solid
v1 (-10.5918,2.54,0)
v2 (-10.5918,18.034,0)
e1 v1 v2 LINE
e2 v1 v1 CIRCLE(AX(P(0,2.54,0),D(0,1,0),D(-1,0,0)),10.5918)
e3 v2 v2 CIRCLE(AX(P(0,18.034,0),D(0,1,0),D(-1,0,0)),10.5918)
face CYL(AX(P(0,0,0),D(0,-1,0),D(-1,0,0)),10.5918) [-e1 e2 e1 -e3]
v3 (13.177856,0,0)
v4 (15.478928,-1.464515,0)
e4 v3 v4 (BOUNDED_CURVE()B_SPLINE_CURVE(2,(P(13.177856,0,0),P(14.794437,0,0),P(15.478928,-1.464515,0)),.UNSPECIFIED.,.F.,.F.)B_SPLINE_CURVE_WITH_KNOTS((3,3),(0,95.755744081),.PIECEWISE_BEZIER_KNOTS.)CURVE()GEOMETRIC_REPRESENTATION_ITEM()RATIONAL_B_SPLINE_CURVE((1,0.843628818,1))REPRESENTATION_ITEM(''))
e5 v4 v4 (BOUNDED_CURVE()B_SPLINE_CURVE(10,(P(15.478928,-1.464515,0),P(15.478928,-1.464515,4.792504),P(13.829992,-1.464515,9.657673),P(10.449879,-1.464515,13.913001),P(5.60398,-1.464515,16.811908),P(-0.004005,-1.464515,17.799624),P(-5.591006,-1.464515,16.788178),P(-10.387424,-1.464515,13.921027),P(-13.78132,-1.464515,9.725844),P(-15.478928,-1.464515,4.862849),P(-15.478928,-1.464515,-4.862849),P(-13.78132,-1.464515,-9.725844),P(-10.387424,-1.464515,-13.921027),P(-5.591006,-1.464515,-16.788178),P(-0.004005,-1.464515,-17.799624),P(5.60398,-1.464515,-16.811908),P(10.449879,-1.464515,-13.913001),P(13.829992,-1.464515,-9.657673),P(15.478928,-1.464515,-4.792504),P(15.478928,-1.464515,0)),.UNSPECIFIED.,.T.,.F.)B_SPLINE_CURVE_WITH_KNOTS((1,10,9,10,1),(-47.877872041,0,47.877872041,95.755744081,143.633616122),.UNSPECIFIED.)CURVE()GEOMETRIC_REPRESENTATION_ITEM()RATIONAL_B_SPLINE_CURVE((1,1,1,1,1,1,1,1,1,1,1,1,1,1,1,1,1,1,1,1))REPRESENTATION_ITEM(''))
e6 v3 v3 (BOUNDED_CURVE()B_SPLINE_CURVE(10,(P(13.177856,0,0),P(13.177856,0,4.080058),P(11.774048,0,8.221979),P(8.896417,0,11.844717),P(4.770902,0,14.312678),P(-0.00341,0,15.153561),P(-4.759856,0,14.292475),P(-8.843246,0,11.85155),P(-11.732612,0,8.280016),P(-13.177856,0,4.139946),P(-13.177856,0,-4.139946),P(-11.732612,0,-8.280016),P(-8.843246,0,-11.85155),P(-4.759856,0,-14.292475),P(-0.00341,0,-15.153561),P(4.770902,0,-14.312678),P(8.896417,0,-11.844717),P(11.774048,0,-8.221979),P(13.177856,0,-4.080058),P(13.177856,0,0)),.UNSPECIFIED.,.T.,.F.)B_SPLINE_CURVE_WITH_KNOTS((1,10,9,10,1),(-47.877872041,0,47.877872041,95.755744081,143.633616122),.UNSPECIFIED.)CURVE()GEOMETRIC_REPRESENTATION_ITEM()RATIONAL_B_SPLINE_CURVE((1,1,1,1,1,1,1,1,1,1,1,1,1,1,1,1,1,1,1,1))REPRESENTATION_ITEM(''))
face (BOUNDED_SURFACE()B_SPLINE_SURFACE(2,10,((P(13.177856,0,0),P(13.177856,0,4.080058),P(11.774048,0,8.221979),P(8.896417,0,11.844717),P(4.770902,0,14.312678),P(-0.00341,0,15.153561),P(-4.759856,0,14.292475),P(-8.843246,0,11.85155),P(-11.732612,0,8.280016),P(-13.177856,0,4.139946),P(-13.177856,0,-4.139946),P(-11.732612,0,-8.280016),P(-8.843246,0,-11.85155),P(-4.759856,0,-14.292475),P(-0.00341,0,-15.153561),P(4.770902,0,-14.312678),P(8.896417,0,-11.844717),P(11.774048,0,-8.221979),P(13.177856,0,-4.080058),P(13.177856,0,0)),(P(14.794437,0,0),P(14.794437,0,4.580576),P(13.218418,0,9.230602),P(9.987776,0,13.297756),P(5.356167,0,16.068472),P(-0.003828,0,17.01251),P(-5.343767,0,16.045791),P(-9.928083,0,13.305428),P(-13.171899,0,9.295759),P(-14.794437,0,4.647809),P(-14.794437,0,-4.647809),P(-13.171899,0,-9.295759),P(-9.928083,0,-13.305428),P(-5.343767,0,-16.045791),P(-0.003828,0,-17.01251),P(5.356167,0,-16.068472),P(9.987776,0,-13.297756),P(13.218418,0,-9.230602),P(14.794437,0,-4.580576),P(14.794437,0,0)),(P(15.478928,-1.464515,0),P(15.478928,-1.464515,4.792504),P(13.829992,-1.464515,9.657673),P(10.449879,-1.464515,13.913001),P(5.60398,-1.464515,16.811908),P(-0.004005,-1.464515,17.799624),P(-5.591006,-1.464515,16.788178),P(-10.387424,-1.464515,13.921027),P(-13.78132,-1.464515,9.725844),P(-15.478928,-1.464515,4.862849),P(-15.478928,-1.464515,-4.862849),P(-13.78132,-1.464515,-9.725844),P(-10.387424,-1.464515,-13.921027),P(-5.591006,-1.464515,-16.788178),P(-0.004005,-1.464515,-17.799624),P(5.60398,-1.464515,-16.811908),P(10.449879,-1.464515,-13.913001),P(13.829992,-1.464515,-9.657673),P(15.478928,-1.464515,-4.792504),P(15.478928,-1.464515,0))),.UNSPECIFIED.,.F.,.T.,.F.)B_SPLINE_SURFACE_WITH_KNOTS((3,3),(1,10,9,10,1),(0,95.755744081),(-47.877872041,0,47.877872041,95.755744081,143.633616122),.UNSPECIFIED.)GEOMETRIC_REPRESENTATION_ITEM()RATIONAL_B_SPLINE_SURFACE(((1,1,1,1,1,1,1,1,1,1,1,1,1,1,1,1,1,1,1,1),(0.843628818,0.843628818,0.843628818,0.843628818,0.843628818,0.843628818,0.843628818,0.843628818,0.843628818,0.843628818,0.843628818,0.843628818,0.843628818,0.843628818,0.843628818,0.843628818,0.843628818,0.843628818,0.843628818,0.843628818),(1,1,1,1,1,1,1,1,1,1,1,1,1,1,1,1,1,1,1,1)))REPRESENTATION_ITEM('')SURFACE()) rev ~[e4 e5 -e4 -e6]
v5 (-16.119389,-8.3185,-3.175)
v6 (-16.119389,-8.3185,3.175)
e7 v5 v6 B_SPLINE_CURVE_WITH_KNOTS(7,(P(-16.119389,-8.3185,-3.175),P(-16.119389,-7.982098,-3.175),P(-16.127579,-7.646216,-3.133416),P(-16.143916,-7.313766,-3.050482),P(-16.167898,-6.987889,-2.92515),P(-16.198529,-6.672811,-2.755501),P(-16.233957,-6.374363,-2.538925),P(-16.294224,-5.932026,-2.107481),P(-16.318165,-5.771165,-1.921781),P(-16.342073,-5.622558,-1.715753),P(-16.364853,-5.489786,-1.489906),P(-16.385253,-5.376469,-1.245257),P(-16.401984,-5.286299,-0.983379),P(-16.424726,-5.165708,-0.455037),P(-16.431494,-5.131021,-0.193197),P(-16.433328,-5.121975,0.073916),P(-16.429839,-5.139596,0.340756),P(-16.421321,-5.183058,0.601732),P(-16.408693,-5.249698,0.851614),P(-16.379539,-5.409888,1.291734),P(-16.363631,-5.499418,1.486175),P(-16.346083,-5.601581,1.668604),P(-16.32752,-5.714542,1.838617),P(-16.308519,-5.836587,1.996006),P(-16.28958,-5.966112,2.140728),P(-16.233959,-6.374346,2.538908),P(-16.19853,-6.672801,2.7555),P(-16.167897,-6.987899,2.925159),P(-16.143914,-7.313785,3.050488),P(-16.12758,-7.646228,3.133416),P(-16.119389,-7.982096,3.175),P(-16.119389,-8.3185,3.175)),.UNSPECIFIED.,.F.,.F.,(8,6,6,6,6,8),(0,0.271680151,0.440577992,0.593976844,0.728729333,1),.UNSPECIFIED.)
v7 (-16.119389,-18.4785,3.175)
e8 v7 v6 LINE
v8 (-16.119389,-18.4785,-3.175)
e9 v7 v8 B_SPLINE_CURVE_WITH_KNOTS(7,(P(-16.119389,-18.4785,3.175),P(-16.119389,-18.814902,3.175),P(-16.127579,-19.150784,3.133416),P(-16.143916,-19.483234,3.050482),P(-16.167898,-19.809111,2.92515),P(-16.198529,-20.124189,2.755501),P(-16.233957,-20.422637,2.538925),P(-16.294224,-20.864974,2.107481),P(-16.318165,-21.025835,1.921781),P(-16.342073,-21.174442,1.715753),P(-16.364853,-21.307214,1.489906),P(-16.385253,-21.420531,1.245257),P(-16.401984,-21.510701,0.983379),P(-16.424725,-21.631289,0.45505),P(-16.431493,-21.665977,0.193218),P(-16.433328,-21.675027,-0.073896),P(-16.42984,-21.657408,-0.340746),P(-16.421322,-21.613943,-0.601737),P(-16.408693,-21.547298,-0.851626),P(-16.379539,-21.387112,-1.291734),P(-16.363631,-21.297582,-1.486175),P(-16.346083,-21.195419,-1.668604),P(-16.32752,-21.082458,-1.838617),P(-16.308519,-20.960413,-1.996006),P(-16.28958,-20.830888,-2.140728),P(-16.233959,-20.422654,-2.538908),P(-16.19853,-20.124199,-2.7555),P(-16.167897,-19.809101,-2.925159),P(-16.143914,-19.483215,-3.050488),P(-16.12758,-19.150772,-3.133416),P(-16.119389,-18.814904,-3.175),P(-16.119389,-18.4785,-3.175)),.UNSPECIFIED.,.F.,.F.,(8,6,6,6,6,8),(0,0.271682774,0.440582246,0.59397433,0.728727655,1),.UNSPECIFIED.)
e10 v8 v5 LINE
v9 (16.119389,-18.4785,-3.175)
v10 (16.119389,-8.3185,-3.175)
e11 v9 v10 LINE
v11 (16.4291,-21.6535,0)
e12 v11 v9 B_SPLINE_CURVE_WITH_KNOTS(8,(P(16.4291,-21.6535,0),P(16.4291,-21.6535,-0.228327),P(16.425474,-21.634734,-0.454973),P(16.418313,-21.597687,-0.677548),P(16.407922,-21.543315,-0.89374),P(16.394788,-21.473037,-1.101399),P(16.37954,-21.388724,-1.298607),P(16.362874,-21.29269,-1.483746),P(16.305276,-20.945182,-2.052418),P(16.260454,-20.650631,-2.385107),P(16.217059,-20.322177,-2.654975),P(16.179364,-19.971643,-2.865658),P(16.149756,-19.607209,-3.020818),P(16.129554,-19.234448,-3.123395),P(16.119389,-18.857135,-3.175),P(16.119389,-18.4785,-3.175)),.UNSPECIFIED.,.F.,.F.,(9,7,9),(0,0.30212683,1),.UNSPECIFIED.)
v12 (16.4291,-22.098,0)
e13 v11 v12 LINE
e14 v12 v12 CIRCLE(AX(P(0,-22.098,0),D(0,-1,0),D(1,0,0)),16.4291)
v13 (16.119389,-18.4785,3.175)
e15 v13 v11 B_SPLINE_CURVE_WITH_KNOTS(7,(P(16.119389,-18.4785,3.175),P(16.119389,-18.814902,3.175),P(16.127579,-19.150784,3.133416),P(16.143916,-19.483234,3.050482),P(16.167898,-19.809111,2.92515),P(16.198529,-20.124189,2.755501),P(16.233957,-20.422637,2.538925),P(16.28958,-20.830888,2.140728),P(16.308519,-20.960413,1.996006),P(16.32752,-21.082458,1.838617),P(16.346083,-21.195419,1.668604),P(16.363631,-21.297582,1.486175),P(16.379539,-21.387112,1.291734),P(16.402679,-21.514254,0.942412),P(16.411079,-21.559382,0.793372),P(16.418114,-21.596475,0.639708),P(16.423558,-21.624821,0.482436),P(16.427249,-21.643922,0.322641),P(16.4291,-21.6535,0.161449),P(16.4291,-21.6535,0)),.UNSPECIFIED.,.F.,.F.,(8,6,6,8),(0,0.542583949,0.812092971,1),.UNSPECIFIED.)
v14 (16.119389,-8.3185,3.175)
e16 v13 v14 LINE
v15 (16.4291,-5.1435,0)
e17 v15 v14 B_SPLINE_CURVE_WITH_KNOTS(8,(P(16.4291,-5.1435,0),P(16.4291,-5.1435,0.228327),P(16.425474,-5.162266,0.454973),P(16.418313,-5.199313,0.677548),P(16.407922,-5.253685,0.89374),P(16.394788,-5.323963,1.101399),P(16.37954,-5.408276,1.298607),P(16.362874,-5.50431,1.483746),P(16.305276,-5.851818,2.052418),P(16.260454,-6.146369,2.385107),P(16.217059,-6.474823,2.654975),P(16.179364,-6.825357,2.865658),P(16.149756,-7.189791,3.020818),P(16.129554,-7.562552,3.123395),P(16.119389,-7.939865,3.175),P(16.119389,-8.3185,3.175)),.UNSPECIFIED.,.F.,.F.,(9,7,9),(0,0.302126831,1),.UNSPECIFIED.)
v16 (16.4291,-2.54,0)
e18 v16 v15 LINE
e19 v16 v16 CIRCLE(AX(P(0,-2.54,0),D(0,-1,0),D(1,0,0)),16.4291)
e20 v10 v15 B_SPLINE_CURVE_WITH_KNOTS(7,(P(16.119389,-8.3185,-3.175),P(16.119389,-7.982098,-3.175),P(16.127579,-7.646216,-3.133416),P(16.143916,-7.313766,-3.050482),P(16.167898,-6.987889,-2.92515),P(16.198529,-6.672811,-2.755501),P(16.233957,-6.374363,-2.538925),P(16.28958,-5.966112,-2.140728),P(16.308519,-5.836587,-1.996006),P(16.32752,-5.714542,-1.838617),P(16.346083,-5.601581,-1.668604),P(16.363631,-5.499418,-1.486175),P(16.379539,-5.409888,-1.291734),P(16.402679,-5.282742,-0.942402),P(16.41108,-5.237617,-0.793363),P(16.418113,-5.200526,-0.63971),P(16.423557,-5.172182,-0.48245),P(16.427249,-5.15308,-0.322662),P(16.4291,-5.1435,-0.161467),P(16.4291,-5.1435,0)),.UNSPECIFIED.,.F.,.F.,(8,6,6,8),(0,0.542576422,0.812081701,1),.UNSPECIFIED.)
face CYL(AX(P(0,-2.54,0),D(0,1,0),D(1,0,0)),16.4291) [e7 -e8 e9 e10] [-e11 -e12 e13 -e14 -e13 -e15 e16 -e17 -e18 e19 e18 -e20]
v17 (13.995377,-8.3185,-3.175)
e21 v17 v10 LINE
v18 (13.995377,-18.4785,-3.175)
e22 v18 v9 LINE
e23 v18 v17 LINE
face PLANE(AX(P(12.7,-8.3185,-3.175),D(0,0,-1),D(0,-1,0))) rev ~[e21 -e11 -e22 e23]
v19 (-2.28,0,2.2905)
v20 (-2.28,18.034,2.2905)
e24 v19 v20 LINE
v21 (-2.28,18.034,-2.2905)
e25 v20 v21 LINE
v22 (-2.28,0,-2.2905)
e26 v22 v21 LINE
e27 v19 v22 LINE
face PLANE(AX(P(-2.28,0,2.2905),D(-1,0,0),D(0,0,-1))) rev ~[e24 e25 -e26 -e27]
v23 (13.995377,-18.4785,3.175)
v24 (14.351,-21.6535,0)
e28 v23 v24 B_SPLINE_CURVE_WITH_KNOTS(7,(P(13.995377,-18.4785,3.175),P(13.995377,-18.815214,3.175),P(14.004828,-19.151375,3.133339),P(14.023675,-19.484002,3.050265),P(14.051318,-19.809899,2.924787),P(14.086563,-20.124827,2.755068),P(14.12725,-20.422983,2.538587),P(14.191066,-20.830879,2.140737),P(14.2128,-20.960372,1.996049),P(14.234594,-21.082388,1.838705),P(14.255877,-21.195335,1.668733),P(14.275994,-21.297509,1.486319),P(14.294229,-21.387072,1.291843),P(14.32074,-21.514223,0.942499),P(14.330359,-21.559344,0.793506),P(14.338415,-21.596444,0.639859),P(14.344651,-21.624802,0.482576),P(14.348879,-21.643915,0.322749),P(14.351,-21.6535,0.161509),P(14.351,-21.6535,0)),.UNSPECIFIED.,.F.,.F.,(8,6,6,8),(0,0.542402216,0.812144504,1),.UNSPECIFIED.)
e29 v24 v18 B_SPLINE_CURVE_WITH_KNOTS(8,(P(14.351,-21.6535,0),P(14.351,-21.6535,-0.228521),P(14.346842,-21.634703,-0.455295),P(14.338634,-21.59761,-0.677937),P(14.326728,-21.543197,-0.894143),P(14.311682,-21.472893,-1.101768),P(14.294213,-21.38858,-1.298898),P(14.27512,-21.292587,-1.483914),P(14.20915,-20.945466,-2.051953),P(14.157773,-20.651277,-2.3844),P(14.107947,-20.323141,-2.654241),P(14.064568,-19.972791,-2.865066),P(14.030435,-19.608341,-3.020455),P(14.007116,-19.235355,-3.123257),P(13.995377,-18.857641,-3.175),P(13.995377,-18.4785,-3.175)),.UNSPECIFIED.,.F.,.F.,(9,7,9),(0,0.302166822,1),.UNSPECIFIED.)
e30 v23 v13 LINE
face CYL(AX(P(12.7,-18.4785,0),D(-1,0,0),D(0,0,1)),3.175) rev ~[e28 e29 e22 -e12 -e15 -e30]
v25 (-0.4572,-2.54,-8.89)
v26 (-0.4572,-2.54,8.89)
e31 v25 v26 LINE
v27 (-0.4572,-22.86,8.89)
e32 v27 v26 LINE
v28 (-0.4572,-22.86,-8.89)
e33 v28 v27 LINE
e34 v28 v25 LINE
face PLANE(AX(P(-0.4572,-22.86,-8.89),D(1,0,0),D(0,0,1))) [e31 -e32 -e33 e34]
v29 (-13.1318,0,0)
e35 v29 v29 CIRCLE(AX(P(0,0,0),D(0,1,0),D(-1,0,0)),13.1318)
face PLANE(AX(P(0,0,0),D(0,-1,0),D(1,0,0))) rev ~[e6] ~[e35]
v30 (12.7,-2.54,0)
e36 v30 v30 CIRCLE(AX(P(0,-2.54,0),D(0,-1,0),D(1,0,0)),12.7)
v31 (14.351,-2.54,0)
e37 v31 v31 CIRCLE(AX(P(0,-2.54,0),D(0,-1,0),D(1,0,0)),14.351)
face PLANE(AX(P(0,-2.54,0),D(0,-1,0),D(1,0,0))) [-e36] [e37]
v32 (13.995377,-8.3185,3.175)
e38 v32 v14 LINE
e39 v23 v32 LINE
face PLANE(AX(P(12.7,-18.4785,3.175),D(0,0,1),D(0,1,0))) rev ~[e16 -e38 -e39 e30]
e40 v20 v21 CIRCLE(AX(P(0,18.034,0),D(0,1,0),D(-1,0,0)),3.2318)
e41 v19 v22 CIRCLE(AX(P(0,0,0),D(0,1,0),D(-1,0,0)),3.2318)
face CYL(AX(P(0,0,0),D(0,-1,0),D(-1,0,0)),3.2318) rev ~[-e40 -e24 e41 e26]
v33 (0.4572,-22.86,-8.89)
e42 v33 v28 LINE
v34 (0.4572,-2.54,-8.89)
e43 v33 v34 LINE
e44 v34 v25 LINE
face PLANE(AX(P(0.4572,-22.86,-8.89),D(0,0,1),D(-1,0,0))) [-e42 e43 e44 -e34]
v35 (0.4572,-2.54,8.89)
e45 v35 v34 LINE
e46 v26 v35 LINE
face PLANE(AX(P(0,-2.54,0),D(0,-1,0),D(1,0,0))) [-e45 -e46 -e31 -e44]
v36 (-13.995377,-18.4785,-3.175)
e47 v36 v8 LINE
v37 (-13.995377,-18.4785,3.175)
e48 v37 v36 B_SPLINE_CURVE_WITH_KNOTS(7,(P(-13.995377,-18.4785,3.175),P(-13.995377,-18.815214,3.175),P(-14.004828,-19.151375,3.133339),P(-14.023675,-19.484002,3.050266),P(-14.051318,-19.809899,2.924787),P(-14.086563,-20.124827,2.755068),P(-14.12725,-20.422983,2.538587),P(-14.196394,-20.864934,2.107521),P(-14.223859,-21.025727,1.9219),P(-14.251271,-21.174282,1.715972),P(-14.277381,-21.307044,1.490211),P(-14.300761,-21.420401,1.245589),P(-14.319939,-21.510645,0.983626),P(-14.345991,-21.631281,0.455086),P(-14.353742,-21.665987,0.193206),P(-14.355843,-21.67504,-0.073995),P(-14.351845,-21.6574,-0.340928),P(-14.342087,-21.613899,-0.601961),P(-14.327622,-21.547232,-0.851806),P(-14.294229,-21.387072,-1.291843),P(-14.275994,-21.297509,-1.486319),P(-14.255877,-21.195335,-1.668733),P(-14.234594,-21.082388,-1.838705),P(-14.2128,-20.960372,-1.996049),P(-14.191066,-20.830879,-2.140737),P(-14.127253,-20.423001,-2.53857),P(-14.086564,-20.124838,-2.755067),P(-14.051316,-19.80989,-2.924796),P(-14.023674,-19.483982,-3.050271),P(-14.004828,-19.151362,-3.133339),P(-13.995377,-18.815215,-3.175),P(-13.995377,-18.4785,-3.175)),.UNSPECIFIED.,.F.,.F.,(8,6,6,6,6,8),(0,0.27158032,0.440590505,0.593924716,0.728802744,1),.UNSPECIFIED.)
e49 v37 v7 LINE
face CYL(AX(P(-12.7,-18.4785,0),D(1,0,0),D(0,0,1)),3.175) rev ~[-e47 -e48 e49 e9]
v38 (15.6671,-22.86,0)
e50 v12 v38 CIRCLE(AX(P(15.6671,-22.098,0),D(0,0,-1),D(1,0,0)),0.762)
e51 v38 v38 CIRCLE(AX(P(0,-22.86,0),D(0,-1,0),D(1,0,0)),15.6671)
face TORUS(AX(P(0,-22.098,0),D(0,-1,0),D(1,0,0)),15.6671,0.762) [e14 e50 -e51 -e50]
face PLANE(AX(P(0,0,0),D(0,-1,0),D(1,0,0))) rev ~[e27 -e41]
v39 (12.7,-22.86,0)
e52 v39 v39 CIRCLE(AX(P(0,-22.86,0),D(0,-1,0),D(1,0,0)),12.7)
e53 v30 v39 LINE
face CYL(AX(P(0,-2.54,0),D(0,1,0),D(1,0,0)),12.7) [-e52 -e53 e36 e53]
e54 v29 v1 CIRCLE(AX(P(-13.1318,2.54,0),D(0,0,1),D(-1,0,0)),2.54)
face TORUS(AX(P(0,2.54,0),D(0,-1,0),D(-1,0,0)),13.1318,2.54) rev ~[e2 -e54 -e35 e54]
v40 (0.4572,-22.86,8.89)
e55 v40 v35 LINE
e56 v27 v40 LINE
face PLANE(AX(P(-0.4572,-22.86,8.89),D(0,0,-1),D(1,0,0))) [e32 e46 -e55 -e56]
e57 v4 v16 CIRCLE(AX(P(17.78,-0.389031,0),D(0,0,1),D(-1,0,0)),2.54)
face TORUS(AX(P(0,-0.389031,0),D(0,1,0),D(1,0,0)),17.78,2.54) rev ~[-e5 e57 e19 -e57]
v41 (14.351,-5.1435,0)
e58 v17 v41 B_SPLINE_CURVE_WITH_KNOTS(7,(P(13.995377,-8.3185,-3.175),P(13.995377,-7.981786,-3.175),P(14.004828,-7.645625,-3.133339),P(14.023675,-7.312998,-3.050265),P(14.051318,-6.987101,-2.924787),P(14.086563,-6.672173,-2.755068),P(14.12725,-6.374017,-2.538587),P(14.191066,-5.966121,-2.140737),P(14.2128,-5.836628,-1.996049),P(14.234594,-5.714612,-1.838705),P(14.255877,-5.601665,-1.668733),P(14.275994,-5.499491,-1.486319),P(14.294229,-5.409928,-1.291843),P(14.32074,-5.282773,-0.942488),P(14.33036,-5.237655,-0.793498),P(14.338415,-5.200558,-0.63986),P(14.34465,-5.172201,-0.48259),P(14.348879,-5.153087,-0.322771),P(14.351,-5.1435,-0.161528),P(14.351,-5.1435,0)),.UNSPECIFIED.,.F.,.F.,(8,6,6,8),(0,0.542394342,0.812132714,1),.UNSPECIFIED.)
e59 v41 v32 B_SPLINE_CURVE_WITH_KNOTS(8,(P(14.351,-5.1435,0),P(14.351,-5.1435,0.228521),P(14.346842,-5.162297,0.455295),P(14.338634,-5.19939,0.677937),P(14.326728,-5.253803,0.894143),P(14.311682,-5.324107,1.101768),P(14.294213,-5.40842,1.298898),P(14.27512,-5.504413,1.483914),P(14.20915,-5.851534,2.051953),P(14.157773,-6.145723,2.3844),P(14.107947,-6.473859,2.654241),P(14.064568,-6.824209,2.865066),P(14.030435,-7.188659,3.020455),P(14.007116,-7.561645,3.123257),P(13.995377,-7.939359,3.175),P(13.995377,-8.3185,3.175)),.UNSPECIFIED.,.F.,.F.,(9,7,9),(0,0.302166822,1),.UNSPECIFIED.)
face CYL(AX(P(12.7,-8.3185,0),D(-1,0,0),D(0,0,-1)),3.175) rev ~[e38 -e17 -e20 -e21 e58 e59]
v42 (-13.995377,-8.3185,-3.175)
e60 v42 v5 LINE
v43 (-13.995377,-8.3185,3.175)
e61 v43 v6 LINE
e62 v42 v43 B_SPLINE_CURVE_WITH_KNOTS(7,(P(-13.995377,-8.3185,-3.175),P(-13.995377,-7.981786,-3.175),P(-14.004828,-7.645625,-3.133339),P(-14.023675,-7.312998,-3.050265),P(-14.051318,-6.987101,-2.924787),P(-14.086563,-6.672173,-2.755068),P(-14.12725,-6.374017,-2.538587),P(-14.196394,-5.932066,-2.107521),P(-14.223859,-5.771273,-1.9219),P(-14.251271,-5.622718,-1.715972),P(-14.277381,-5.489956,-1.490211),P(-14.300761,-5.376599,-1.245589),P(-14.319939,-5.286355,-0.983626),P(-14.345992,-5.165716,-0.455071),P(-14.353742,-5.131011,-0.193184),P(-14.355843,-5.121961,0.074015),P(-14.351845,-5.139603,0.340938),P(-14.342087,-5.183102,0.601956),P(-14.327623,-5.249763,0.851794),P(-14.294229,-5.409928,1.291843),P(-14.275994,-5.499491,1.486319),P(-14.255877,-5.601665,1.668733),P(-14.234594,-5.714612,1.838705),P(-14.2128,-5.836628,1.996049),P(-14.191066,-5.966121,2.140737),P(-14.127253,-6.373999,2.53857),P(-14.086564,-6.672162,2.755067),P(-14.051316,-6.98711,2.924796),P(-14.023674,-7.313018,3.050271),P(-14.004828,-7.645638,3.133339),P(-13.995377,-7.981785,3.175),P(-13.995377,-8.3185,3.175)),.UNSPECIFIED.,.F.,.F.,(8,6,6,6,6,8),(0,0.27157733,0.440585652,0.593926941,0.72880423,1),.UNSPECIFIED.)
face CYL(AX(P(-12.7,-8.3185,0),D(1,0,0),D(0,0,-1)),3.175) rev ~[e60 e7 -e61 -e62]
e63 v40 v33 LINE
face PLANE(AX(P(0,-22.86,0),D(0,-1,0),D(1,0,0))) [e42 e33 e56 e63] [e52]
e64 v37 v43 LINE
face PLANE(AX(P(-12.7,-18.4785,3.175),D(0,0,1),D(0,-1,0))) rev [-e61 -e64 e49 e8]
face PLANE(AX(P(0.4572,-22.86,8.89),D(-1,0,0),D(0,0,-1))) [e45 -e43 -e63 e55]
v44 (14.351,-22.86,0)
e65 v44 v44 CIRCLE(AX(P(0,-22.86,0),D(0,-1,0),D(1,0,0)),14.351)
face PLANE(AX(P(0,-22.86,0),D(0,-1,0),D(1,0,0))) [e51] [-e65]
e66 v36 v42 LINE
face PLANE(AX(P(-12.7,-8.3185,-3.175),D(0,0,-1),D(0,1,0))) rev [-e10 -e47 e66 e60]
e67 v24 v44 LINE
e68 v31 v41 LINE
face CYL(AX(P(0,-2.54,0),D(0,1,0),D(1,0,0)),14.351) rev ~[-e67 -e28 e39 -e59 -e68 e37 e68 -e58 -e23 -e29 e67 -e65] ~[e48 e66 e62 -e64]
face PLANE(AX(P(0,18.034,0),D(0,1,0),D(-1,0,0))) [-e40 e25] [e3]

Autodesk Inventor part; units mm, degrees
ref_plane "XZ Plane" through (0, 0, 0) normal (0, 1, 0) x (-1, 0, 0)
ref_plane "XY Plane" through (0, 0, 0) normal (0, 0, 1) x (1, 0, 0)
sketch "Sketch1" plane through (0, 0, 0) normal (0, 1, 0) x (-1, 0, 0)
  circle A0 centre (0, 0) radius 3.2318
  line L0 (2.28, 2.2905) -> (2.28, -2.2905)
  circle A1 centre (0, 0) radius 10.5918
  dimension "d2" = 5.5118
  dimension "d3" = 21.1836
extrude "Extrusion1" add sketch "Sketch1" along normal blind 18.034 contours A0 L0 | A1 picked at (2.4147, -0.6)
sketch "Sketch2" plane through (0, 0, 0) normal (0, -1, 0) x (1, 0, 0)
  circle A0 centre (0, 0) radius 15.24
  dimension "d6" = 30.48
extrude "Extrusion2" add sketch "Sketch2" along normal blind 2.54
sketch "Sketch3" plane through (0, -2.54, 0) normal (0, -1, 0) x (1, 0, 0)
  circle A0 centre (0, 0) radius 14.351
  circle A1 centre (0, 0) radius 16.4291
  dimension "d9" = 28.702
extrude "Extrusion3" add sketch "Sketch3" along normal blind 20.32
fillet "Fillet3" radius 2.54 1 edges at (10.5918, 0, 0)
fillet "Fillet4" radius 2.54 1 edges at (-15.24, -2.54, 0)
fillet "Fillet5" radius 2.54 1 edges at (-15.24, 0, 0)
ref_plane "Work Plane1" through (12.7, 0, 0) normal (1, 0, 0) x (0, 1, 0)
sketch "Sketch6" plane through (12.7, 0, 0) normal (1, 0, 0) x (0, 1, 0)
  arc A0 (-8.3185, -1.27) -> (-8.3185, 1.27) centre (-8.3185, 0) ccw construction
  arc A1 (-18.4785, 1.27) -> (-18.4785, -1.27) centre (-18.4785, 0) ccw construction
  line L0 (-18.4785, 1.27) -> (-8.3185, 1.27) construction
  line L1 (-8.3185, -1.27) -> (-18.4785, -1.27) construction
  arc A2 (-8.3185, -3.175) -> (-8.3185, 3.175) centre (-8.3185, 0) ccw
  line L2 (-8.3185, -3.175) -> (-18.4785, -3.175)
  arc A3 (-18.4785, 3.175) -> (-18.4785, -3.175) centre (-18.4785, 0) ccw
  line L3 (-18.4785, 3.175) -> (-8.3185, 3.175)
  point P0 (0, 0)
  dimension "d34" = 3.175
extrude "Extrusion6" cut sketch "Sketch6" along normal blind 25.4
mirror "Mirror1" about plane through (0, 0, 0) normal (1, 0, 0) of "Extrusion6"
fillet "Fillet10" radius 0.762 1 edges at (-16.4291, -22.86, 0)
sketch "Sketch7" plane through (0, -2.54, 0) normal (0, -1, 0) x (1, 0, 0)
  circle A0 centre (0, 0) radius 12.7
  dimension "d40" = 25.4
extrude "Extrusion7" add sketch "Sketch7" along normal blind 20.32
sketch "Sketch8" plane through (0, -22.86, 0) normal (0, -1, 0) x (1, 0, 0)
  line L0 (-0.4572, 8.89) -> (0.4572, 8.89)
  line L1 (0.4572, 8.89) -> (0.4572, -8.89)
  line L2 (0.4572, -8.89) -> (-0.4572, -8.89)
  line L3 (-0.4572, -8.89) -> (-0.4572, 8.89)
  line L4 (-0.4572, 8.89) -> (0.4572, -8.89) construction
  line L5 (0.4572, 8.89) -> (-0.4572, -8.89) construction
  point P0 (0, 0)
  dimension "d43" = 0.9144
  dimension "d44" = 17.78
extrude "Extrusion8" cut sketch "Sketch8" against normal blind 20.32
properties part number "Autofeeder part 1"
